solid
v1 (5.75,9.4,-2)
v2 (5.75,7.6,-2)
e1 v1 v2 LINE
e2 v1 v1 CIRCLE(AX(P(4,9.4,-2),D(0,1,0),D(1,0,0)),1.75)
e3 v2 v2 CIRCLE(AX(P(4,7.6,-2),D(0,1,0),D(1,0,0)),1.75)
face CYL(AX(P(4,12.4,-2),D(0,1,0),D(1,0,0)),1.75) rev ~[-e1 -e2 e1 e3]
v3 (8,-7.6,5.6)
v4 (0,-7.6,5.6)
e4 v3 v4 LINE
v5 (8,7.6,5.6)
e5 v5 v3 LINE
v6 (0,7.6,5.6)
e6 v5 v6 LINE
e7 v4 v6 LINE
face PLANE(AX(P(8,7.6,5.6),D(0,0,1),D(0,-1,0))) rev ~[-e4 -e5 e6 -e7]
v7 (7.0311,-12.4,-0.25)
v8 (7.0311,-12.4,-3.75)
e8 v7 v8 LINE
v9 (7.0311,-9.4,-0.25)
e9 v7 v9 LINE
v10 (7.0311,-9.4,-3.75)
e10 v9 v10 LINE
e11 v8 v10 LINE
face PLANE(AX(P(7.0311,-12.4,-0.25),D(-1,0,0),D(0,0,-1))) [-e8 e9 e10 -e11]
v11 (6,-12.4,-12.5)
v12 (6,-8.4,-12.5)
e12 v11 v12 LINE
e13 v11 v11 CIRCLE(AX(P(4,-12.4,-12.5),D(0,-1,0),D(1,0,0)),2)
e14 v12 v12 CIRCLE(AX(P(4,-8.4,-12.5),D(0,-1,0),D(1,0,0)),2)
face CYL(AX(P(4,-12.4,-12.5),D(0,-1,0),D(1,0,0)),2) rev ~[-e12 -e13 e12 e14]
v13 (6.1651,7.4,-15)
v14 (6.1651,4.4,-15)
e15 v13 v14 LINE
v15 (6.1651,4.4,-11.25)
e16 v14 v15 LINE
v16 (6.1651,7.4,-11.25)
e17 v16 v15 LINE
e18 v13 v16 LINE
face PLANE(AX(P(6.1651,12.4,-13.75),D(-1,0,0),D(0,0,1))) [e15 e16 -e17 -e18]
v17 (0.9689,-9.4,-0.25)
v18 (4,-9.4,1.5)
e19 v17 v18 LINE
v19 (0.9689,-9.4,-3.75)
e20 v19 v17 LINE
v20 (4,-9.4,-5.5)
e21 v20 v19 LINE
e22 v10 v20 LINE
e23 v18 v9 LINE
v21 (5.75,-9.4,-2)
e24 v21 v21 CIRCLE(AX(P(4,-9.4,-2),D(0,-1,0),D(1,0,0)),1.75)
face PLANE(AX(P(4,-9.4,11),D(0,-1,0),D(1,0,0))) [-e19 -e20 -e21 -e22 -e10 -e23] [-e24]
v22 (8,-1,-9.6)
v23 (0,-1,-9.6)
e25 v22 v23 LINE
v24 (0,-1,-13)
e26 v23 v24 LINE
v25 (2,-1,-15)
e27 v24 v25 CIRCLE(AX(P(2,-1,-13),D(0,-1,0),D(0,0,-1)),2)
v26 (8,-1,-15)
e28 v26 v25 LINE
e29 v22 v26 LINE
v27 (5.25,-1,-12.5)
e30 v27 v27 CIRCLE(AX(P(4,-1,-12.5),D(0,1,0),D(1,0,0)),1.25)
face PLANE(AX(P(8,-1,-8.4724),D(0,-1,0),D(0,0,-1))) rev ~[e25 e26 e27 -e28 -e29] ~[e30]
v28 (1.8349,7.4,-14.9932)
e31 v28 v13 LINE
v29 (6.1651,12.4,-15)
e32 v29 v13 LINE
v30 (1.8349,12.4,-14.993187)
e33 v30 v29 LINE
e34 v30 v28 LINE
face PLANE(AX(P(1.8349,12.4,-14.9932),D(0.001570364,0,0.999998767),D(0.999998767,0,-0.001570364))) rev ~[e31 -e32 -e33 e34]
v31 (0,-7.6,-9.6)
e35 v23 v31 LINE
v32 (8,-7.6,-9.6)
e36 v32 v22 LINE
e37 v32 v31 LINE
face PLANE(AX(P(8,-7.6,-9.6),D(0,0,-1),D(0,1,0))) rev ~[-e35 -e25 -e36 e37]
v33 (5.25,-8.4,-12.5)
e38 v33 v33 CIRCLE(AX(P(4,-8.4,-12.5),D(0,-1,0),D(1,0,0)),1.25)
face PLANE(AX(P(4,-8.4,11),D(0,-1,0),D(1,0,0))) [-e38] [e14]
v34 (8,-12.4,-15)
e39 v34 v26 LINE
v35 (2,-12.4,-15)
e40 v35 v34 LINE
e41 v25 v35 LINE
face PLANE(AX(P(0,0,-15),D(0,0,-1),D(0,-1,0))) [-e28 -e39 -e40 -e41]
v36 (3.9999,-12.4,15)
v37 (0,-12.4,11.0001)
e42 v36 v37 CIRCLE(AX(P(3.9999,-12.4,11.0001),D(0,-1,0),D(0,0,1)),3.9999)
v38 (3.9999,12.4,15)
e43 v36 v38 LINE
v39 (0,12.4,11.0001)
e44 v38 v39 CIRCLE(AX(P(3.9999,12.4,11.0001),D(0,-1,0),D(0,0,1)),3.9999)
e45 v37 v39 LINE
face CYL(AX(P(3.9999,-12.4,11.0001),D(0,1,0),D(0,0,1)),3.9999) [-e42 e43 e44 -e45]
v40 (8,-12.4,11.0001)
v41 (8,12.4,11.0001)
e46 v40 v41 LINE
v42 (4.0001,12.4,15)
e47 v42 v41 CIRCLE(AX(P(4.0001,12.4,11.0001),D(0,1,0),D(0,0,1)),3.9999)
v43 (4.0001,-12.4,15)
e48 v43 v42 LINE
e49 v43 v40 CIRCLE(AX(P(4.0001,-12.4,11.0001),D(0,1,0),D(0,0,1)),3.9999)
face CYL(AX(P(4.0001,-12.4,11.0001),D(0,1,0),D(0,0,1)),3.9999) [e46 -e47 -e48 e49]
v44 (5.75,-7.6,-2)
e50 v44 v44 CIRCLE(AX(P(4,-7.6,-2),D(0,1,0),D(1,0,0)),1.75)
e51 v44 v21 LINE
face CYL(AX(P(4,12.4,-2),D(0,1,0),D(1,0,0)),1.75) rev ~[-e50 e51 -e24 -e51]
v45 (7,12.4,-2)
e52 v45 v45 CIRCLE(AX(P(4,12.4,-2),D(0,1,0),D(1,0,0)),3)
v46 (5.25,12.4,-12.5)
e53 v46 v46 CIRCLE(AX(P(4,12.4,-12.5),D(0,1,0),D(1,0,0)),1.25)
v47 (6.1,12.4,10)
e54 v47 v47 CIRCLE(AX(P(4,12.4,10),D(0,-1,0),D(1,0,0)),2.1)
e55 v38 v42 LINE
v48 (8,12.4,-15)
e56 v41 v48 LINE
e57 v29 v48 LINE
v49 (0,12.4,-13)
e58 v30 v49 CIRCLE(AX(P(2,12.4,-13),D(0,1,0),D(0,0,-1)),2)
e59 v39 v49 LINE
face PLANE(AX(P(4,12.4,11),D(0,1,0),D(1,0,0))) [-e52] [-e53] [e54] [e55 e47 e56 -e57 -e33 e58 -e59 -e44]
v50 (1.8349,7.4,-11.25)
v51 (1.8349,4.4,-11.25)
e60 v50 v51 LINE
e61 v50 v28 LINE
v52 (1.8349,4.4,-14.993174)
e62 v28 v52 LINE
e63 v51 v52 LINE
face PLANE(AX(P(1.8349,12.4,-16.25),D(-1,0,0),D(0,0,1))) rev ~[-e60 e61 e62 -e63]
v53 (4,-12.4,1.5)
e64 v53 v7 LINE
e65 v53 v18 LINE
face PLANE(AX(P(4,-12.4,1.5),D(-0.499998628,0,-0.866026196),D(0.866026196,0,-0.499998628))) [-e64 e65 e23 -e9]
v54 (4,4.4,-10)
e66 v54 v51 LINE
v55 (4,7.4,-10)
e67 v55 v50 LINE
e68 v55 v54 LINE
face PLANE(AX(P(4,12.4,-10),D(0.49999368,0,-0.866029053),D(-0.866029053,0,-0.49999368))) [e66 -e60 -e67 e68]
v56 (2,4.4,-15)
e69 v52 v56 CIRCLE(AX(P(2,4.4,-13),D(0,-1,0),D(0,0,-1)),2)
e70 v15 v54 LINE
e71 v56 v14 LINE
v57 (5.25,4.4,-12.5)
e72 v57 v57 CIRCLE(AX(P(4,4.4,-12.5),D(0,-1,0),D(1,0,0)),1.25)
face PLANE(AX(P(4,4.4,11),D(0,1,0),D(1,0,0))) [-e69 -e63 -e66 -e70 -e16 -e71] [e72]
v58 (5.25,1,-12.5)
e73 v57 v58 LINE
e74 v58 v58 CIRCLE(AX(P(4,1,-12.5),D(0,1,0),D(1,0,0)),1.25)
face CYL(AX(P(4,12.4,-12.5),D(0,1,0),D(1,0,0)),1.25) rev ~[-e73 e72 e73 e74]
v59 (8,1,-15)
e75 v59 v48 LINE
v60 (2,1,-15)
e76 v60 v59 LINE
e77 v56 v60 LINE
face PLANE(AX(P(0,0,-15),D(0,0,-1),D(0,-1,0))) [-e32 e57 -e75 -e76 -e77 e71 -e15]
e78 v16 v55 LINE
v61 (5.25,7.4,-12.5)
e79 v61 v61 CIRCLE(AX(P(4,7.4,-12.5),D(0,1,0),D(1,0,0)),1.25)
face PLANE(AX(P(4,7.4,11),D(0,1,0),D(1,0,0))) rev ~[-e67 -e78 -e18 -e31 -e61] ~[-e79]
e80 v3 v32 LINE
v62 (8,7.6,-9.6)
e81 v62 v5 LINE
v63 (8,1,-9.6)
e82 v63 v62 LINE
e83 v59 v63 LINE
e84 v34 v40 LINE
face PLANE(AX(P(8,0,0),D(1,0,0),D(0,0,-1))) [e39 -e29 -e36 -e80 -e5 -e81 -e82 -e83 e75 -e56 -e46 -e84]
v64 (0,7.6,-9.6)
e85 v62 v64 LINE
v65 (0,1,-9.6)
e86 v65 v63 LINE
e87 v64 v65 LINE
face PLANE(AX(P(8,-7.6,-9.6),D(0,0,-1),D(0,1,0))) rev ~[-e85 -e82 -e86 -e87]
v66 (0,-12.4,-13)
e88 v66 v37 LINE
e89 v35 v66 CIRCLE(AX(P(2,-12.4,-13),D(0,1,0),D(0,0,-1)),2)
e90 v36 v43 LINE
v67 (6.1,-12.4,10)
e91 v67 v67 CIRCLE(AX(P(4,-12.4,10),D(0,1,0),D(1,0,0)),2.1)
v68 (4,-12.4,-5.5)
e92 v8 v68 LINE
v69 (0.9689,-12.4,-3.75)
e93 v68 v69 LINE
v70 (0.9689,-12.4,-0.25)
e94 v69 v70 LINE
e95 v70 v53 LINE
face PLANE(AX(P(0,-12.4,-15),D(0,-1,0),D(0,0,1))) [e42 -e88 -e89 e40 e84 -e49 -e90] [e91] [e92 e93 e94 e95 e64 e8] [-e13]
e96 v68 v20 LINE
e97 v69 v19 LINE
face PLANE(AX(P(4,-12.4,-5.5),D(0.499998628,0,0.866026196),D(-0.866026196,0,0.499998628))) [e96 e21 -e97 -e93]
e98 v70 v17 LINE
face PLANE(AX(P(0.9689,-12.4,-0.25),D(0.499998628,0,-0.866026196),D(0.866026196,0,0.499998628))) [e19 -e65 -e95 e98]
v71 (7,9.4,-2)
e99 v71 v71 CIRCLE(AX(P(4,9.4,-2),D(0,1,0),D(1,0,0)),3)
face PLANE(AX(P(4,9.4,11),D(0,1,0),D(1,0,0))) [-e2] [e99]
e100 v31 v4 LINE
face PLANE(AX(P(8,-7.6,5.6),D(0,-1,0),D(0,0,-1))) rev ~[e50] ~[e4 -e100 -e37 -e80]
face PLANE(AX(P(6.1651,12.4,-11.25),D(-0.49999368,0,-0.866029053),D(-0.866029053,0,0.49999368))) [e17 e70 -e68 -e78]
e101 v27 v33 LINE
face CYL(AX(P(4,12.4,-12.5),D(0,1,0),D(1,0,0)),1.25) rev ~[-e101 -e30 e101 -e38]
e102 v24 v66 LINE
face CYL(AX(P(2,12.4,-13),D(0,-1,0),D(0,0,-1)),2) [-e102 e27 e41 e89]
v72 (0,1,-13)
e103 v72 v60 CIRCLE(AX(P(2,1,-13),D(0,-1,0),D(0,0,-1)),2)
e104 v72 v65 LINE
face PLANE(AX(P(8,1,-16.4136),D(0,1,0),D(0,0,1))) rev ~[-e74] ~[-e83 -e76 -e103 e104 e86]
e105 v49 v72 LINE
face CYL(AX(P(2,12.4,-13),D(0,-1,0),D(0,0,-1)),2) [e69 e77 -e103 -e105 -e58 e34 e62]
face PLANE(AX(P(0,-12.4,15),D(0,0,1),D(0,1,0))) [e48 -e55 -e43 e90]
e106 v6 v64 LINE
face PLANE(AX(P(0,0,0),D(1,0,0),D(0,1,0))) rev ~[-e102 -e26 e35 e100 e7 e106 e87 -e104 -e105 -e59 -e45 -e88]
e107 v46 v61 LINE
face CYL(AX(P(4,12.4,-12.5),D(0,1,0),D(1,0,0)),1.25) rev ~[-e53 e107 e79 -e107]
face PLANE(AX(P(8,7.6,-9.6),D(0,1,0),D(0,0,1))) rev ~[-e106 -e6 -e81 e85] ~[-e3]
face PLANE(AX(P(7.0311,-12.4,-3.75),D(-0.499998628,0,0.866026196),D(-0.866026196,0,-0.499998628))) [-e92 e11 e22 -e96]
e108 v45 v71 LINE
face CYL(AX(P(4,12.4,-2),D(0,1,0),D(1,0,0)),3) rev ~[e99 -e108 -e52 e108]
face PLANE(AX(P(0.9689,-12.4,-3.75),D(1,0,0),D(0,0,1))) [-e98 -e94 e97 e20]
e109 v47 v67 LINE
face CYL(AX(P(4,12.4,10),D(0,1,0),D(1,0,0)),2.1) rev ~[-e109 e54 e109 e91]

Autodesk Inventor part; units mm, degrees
ref_plane "YZ Plane" through (0, 0, 0) normal (1, 0, 0) x (0, 1, 0)
ref_plane "XZ Plane" through (0, 0, 0) normal (0, 1, 0) x (-1, 0, 0)
ref_plane "XY Plane" through (0, 0, 0) normal (0, 0, 1) x (1, 0, 0)
sketch "Sketch1" plane through (0, 0, 0) normal (1, 0, 0) x (0, 1, 0)
  line L0 (-12.4, 15) -> (12.4, 15)
  line L1 (12.4, 15) -> (12.4, -15)
  line L2 (12.4, -15) -> (-12.4, -15)
  line L3 (-12.4, -15) -> (-12.4, 15)
  line L4 (-12.4, 15) -> (12.4, -15) construction
  line L5 (12.4, 15) -> (-12.4, -15) construction
  line L6 (0, -15) -> (0, -1.5)
  circle A0 centre (0, -1.5) radius 8
  point P0 (0, 0)
  dimension "d0" = 24.8
  dimension "d1" = 30
  dimension "d2" = 13.5
  dimension "d3" = 16
extrude "Extrusion1" add sketch "Sketch1" along normal blind 8
sketch "Sketch3" plane through (0, 12.4, 15) normal (0, 1, 0) x (1, 0, 0)
  line L0 (0, 0) -> (8, 0) projected
  line L1 (4, 0) -> (4, 5)
  circle A0 centre (4, 5) radius 2.1
  point P0 (0, 15)
  dimension "d9" = 5
  dimension "d10" = 4.2
extrude "Extrusion3" cut sketch "Sketch3" against normal up to next
sketch "Sketch4" plane through (0, 12.4, 15) normal (0, 1, 0) x (1, 0, 0)
  line L0 (0, 30) -> (8, 30) projected
  line L1 (4, 30) -> (4, 27.5)
  circle A0 centre (4, 27.5) radius 1.25
  point P0 (0, 15)
  dimension "d13" = 2.5
  dimension "d14" = 2.5
extrude "Extrusion4" cut sketch "Sketch4" against normal through all
fillet "Fillet1" radius 4 2 edges at (0, 0, 15) (8, 0, 15)
fillet "Fillet2" radius 2 1 edges at (0, 0, -15)
sketch "Sketch5" plane through (8, 0, 0) normal (1, 0, 0) x (0, 0, -1)
  arc A0 (1.5, 8) -> (1.5, 8) centre (1.5, 0) ccw projected
  circle A1 centre (1.5, 0) radius 8
  point P0 (0, 0)
extrude "Extrusion5" add sketch "Sketch5" against normal blind 8
sketch "Sketch6" plane through (8, 0, 0) normal (1, 0, 0) x (0, 0, -1)
  line L0 (-5.6, -7.6) -> (9.6, -7.6)
  line L1 (9.6, -7.6) -> (9.6, 7.6)
  line L2 (9.6, 7.6) -> (-5.6, 7.6)
  line L3 (-5.6, 7.6) -> (-5.6, -7.6)
  line L4 (-5.6, -7.6) -> (9.6, 7.6) construction
  line L5 (9.6, -7.6) -> (-5.6, 7.6) construction
  point P0 (0, 0)
  point P1 (2, 0)
  dimension "d22" = 15.2
  dimension "d23" = 15.2
  dimension "d24" = 2
extrude "Extrusion6" cut sketch "Sketch6" against normal up to next
sketch "Sketch7" plane through (8, 0, 0) normal (1, 0, 0) x (0, 0, -1)
  line L0 (8.4724, -1) -> (16.4136, -1)
  line L1 (16.4136, -1) -> (16.4136, 1)
  line L2 (16.4136, 1) -> (8.4724, 1)
  line L3 (8.4724, 1) -> (8.4724, -1)
  line L4 (8.4724, -1) -> (16.4136, 1) construction
  line L5 (16.4136, -1) -> (8.4724, 1) construction
  point P0 (0, 0)
  point P1 (12.443, 0)
  dimension "d27" = 2
extrude "Extrusion7" cut sketch "Sketch7" against normal through all
sketch "Sketch8" plane through (4, 12.4, 11) normal (0, 1, 0) x (1, 0, 0)
  circle A0 centre (0, 23.5) radius 1.25 projected
  line L0 (0, 26) -> (2.1651, 24.75)
  line L1 (2.1651, 24.75) -> (2.1651, 22.25)
  line L2 (2.1651, 22.25) -> (0, 21)
  line L3 (0, 21) -> (-2.1651, 22.25)
  line L4 (-2.1651, 22.25) -> (-2.1651, 24.75)
  line L5 (-2.1651, 24.75) -> (0, 26)
  point P0 (-4, 11)
  dimension "d30" = 2.5
extrude "Extrusion8" cut sketch "Sketch8" against normal blind 8
sketch "Sketch9" plane through (4, 4.4, -10) normal (0.5, 0, -0.8660254) x (-0.8660254, 0, -0.5)
  point P0 (-1.5359, -4.4)
sketch "Sketch10" plane through (4, 12.4, 11) normal (0, 1, 0) x (1, 0, 0)
  line L0 (-2.1651, 24.75) -> (0, 26) projected
  line L1 (2.1651, 27.25) -> (-2.1651, 27.25)
  line L2 (-2.1651, 27.25) -> (-2.1651, 24.75)
  line L3 (-2.1651, 24.75) -> (2.1651, 24.75)
  line L4 (2.1651, 24.75) -> (2.1651, 27.25)
  line L5 (0, 26) -> (2.1651, 24.75) projected
  line L6 (2.1651, 27.25) -> (-2.1651, 24.75) construction
  line L7 (-2.1651, 27.25) -> (2.1651, 24.75) construction
  point P0 (-4, 11)
extrude "Extrusion9" cut sketch "Sketch10" against normal blind 8
sketch "Sketch11" plane through (4, 12.4, 11) normal (0, 1, 0) x (1, 0, 0)
  line L0 (2.1651, 22.25) -> (0, 21) projected
  line L1 (0, 21) -> (-2.1651, 22.25)
  arc A0 (-2.1651, 25.9932) -> (-4, 24) centre (-2, 24) ccw projected
  line L2 (-4, 24) -> (-2.1651, 22.25)
  arc A1 (-2.1651, 25.9932) -> (-4, 24) centre (-2, 24) ccw
  line L3 (-2.1651, 25.9932) -> (2.1651, 26)
  line L4 (2.1651, 22.25) -> (0, 21) projected
  line L5 (2.1651, 26) -> (2.1651, 22.25)
  line L6 (2.1651, 22.25) -> (0, 21)
  circle A2 centre (0, 23.5) radius 1.25 projected
  circle A3 centre (0, 23.5) radius 1.25
  point P0 (-4, 11)
extrude "Extrusion10" add sketch "Sketch11" against normal blind 5
sketch "Sketch12" plane through (4, -12.4, 11) normal (0, -1, 0) x (1, 0, 0)
  circle A0 centre (0, -23.5) radius 1.25 projected
  circle A1 centre (0, -23.5) radius 2
  point P0 (-4, -11)
  dimension "d37" = 4
extrude "Extrusion11" cut sketch "Sketch12" against normal blind 4
sketch "Sketch13" plane through (4, 12.4, 11) normal (0, 1, 0) x (1, 0, 0)
  line L0 (-2, 26) -> (4, 26) projected
  line L1 (4, 26) -> (0, 26)
  line L2 (0, 26) -> (0, 13)
  line L3 (0, 13) -> (4, 13)
  line L4 (4, 13) -> (4, 26)
  circle A0 centre (0, 13) radius 1.75
  point P0 (-4, 11)
  dimension "d40" = 4
  dimension "d41" = 13
  dimension "d42" = 3.5
extrude "Extrusion12" cut sketch "Sketch13" against normal through all contours A0 L3 L2 | L2 L3 A0
sketch "Sketch14" plane through (4, -12.4, 11) normal (0, -1, 0) x (1, 0, 0)
  circle A0 centre (0, -13) radius 1.75 projected
  line L0 (0, -16.5) -> (-3.0311, -14.75)
  line L1 (-3.0311, -14.75) -> (-3.0311, -11.25)
  line L2 (-3.0311, -11.25) -> (0, -9.5)
  line L3 (0, -9.5) -> (3.0311, -11.25)
  line L4 (3.0311, -11.25) -> (3.0311, -14.75)
  line L5 (3.0311, -14.75) -> (0, -16.5)
  point P0 (-4, -11)
  dimension "d45" = 3.5
extrude "Extrusion13" cut sketch "Sketch14" against normal blind 3
sketch "Sketch15" plane through (4, 12.4, 11) normal (0, 1, 0) x (1, 0, 0)
  circle A0 centre (0, 13) radius 1.75 projected
  circle A1 centre (0, 13) radius 3
  point P0 (-4, 11)
  dimension "d48" = 6
extrude "Extrusion14" cut sketch "Sketch15" against normal blind 3
properties part number "arm_grip" material "Nylon 6/6"
